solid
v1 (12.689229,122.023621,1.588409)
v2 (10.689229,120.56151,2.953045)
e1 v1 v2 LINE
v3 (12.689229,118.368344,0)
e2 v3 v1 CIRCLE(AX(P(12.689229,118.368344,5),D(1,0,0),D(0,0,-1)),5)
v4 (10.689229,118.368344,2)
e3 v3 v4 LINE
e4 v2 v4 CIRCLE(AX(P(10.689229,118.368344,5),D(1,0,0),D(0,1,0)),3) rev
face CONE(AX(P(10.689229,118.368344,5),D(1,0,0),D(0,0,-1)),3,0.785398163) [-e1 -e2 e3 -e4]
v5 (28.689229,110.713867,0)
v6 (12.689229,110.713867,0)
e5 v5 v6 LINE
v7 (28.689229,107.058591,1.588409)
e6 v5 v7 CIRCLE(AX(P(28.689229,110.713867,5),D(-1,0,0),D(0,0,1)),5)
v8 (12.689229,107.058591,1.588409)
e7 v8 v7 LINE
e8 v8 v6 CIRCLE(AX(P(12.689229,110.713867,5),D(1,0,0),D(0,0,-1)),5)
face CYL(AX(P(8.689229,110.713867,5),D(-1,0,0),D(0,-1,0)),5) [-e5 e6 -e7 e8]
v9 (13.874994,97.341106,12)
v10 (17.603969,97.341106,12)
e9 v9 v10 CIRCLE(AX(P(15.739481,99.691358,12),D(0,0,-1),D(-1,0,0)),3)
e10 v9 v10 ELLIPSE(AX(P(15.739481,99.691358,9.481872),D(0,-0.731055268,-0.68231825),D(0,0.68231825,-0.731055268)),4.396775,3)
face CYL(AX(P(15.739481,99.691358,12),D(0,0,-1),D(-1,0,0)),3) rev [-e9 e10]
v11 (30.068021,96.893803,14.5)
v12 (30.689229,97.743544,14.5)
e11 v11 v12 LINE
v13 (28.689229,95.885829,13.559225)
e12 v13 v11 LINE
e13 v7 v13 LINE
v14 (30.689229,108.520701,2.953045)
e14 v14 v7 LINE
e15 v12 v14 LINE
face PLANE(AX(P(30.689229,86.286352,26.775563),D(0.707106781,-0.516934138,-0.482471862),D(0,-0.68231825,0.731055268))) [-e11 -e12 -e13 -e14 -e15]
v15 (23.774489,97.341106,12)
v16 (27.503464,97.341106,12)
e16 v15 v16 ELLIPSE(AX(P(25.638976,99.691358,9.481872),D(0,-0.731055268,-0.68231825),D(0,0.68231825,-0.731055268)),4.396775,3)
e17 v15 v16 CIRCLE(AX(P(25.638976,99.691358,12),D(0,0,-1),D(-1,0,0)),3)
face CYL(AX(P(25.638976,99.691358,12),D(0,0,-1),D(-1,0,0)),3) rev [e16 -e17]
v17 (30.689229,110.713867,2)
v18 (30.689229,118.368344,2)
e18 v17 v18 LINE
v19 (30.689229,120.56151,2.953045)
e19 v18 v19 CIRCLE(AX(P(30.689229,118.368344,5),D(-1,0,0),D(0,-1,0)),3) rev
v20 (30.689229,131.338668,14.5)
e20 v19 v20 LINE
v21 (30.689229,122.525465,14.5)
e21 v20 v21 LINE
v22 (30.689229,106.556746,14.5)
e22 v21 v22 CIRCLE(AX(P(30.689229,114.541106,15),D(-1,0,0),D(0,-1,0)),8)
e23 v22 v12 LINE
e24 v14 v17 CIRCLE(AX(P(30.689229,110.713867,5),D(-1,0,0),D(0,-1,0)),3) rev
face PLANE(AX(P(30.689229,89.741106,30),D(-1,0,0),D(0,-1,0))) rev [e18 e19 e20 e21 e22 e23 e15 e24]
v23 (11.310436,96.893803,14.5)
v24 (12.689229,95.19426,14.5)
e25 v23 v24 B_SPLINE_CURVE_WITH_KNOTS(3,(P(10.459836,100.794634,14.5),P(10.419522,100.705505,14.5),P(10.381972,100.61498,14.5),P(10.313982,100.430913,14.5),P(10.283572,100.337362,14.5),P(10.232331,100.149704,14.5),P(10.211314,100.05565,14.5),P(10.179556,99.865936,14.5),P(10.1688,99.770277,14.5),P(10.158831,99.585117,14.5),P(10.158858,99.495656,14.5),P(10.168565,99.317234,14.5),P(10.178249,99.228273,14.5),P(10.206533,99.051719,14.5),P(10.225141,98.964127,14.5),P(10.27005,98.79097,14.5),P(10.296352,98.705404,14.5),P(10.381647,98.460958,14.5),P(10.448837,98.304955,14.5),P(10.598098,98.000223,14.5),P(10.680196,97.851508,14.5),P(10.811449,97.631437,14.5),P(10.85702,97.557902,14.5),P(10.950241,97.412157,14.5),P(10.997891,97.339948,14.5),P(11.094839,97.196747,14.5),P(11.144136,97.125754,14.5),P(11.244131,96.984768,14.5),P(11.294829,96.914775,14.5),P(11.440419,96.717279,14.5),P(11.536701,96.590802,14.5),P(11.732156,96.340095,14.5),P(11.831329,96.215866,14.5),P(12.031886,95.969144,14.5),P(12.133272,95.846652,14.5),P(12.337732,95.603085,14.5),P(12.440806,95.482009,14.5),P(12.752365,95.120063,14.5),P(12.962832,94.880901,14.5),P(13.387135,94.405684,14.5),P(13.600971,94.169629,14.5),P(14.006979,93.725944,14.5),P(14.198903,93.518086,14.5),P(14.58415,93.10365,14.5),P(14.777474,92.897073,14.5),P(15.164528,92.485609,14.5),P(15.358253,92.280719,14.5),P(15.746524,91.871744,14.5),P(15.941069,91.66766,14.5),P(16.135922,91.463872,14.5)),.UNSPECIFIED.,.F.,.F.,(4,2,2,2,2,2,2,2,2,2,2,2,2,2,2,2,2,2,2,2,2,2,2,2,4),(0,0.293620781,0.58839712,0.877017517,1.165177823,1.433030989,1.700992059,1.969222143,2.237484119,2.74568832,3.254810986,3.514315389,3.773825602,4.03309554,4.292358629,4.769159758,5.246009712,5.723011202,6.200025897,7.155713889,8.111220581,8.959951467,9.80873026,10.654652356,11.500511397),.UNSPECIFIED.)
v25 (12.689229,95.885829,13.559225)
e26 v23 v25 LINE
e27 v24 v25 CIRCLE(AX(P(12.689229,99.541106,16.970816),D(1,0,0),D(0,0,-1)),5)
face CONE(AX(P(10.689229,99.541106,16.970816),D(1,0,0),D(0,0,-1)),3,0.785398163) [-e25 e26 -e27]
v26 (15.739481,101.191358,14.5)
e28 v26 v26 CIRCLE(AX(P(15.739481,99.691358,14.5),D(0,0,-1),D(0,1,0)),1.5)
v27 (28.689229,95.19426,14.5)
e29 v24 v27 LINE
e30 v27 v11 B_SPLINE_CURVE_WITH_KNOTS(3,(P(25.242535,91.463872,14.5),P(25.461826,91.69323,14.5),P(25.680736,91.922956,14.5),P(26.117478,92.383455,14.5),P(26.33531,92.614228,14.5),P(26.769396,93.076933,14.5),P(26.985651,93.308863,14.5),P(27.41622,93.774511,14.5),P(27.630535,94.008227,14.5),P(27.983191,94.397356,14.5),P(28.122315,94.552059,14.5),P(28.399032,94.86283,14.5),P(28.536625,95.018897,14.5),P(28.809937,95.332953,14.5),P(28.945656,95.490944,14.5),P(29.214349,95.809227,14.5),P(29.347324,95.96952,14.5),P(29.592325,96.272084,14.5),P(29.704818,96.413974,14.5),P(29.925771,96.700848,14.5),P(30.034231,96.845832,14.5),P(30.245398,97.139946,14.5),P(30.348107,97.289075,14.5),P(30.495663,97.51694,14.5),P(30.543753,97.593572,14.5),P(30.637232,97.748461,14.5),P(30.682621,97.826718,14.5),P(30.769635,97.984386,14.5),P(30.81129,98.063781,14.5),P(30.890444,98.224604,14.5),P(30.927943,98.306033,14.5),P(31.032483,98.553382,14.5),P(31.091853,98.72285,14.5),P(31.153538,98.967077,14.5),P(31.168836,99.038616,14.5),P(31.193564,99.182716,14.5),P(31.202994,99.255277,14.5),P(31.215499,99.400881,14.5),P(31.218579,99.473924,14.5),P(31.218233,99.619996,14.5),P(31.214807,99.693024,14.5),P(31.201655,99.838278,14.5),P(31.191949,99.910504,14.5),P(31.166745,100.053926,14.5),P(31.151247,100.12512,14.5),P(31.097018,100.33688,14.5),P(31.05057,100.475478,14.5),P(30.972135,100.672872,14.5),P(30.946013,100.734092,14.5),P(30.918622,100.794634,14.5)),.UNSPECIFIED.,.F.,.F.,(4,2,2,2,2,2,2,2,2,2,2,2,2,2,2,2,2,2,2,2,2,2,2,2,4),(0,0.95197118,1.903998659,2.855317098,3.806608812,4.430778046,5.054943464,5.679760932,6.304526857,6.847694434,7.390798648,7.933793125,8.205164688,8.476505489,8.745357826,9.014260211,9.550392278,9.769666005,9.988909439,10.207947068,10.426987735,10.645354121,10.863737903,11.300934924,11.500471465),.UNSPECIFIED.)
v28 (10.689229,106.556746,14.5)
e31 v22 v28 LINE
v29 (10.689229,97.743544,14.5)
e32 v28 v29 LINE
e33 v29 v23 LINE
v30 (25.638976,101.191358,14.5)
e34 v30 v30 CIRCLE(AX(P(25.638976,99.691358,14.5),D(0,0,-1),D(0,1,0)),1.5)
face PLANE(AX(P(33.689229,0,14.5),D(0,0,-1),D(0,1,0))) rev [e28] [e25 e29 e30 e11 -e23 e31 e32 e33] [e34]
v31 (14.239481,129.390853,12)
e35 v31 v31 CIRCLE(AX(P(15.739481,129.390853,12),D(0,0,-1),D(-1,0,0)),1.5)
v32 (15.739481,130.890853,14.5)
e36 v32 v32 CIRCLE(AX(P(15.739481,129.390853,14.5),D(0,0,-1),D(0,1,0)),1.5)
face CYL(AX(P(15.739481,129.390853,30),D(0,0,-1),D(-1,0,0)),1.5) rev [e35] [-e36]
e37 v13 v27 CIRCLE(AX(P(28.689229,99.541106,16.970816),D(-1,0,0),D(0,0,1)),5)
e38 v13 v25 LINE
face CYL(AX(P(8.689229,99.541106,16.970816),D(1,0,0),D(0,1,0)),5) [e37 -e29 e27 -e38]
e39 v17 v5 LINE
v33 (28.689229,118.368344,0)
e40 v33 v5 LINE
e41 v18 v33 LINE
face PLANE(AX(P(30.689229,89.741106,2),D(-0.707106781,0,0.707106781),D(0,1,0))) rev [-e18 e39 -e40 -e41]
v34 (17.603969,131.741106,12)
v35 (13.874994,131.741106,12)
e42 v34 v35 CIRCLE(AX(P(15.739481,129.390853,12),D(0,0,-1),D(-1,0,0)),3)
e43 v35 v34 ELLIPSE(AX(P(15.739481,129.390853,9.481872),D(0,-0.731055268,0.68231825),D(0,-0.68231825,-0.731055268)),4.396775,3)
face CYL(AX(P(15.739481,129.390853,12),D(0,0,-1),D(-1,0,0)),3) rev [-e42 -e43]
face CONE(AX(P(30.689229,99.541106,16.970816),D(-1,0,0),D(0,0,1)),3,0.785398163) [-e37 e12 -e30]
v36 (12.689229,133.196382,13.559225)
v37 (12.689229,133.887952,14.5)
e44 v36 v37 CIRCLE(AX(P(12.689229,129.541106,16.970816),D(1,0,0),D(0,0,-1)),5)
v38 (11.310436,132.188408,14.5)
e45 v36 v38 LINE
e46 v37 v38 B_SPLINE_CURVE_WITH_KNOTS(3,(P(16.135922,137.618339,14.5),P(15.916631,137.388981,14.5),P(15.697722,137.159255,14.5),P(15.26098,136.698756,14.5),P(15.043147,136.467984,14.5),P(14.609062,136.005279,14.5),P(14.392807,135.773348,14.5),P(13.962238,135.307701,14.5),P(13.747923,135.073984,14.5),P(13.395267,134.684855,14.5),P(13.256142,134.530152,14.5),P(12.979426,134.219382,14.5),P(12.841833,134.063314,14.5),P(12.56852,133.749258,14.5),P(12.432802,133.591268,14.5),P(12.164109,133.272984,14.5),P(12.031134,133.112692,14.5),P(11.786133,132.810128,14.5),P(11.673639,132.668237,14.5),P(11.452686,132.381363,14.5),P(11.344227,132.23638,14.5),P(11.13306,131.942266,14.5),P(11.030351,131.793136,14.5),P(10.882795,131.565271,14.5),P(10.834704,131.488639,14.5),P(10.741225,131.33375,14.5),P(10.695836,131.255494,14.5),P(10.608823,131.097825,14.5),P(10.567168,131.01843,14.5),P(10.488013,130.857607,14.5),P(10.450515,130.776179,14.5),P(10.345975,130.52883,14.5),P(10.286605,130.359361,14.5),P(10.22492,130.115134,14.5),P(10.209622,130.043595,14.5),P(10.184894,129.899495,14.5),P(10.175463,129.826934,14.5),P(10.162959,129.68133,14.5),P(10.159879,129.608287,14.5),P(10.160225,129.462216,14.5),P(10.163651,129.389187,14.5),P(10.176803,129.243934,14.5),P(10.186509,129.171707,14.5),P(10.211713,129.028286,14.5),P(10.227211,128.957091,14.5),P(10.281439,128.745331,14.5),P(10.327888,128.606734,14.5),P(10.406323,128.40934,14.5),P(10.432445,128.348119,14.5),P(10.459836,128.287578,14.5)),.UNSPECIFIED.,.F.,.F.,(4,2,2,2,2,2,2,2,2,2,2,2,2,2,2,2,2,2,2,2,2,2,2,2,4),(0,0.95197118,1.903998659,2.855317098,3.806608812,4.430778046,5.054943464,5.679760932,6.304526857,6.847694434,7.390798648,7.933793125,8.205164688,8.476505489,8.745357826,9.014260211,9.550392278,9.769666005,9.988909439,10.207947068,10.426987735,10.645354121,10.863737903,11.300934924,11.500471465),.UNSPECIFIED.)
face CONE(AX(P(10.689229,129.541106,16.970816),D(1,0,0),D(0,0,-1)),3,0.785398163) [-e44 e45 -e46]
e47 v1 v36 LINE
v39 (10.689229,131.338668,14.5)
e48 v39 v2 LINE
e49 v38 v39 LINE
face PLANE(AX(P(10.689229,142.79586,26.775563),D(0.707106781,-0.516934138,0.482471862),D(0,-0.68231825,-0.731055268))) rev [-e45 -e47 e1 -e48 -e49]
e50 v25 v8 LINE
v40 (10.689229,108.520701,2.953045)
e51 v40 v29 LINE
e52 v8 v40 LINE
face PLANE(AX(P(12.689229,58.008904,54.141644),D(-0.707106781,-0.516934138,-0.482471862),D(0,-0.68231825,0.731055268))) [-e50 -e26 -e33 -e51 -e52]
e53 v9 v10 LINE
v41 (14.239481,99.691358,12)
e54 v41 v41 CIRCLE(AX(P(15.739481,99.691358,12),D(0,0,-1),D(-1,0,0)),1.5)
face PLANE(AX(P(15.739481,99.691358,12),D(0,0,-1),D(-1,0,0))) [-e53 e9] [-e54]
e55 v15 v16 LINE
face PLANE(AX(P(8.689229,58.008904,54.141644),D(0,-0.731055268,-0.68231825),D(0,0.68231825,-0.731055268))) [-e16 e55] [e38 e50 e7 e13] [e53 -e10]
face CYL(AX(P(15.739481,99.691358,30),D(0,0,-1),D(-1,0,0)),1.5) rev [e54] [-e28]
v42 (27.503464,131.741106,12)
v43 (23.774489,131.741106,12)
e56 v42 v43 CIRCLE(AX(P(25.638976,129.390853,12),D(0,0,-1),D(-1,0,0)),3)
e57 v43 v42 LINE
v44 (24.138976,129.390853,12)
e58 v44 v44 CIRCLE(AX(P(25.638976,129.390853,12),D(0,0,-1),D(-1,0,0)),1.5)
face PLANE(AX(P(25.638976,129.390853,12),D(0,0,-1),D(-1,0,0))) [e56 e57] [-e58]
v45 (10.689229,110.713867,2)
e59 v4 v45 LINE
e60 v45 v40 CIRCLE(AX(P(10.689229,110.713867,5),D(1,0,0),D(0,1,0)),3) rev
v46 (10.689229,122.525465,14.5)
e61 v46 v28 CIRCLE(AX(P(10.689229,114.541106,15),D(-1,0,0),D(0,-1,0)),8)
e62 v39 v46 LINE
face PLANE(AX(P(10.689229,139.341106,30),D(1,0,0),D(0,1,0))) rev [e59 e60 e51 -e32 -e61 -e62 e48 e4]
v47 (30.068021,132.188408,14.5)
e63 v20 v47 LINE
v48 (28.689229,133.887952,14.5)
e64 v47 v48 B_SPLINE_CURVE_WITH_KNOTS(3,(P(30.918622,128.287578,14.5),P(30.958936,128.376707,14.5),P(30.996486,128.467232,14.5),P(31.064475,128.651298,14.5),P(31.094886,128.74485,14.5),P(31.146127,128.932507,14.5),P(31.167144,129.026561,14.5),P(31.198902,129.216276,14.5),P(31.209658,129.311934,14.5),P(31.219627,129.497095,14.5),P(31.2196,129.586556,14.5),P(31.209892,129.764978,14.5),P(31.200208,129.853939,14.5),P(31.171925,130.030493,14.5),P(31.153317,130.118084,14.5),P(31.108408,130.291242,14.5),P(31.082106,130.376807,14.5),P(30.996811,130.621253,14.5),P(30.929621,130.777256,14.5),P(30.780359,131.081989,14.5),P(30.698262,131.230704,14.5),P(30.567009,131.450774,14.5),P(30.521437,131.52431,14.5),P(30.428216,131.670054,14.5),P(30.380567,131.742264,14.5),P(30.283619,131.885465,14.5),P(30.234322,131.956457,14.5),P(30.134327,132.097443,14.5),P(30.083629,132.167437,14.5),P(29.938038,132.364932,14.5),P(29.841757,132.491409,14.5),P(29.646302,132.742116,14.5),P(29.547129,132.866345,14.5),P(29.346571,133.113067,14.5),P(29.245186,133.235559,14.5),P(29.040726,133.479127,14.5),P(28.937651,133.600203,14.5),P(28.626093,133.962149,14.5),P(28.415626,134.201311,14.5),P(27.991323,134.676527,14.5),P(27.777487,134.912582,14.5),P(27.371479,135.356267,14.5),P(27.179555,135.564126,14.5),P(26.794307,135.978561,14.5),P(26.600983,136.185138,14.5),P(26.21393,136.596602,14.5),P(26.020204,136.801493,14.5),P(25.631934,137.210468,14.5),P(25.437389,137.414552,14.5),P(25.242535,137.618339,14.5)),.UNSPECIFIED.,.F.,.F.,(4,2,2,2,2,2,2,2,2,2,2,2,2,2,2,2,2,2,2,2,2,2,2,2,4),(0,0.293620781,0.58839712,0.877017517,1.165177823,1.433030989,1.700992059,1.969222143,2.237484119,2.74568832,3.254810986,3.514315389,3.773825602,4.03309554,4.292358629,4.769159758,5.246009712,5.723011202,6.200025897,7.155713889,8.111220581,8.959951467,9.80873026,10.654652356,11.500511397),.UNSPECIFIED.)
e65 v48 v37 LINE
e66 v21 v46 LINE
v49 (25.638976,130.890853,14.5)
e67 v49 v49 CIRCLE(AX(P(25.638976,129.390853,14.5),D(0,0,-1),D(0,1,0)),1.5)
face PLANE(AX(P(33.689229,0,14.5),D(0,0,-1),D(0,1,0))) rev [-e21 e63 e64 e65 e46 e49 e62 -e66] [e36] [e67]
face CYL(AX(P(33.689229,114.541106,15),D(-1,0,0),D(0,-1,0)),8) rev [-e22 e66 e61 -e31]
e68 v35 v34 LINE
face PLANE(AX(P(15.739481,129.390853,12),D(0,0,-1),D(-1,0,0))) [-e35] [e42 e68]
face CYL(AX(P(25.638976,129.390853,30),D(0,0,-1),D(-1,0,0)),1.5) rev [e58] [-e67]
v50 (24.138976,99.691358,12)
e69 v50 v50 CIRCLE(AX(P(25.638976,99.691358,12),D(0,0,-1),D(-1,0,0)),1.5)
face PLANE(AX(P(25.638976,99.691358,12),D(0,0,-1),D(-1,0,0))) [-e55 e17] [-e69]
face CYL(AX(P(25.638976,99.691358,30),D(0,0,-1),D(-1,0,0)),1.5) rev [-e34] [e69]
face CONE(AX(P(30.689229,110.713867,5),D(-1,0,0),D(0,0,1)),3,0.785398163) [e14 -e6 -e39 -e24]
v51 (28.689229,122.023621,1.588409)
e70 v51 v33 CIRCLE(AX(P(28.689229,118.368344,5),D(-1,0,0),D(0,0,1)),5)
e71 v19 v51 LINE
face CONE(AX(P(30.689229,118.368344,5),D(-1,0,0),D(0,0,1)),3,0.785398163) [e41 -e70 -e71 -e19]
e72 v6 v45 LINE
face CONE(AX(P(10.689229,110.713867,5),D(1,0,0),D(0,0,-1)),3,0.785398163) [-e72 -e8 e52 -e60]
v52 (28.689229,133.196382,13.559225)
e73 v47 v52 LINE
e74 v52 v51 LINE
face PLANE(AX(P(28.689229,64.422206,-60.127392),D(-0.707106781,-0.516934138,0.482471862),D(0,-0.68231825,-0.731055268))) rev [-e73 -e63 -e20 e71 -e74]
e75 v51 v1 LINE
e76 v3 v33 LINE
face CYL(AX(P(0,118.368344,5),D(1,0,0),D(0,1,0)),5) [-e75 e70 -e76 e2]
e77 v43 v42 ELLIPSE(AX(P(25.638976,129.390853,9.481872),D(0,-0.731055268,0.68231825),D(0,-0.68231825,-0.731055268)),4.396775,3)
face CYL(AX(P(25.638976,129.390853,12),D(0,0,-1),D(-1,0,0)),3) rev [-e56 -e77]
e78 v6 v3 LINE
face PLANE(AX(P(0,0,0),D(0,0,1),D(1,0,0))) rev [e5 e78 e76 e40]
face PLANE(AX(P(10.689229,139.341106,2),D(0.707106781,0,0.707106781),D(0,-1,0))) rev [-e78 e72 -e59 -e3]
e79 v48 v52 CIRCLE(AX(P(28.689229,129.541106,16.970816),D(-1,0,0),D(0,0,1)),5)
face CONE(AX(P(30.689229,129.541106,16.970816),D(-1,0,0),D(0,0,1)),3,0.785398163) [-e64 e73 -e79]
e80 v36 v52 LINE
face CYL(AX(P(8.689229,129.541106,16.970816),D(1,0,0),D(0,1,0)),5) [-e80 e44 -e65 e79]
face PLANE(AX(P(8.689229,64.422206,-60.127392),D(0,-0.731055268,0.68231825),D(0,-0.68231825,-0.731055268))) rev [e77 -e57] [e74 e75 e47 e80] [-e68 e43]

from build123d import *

# Parameters (mm, degrees)
SKETCH2_W           = 20
SKETCH2_H           = 49.6
SKETCH2_R           = 1.5
BOSS_EXTRUDE1_DEPTH = 30
CUT_EXTRUDE1_DEPTH  = 30
CUT_EXTRUDE2_DEPTH  = 22
FILLET1_R           = 5
FILLET2_R           = 2
CHAMFER1_SIZE       = 2
SKETCH5_R           = 3
SKETCH5_R_2         = 1.5
CUT_EXTRUDE3_DEPTH  = 12
CUT_EXTRUDE4_DEPTH  = 23


with BuildPart() as part:
    # Sketch2 → Boss-Extrude1 (new body)
    with BuildSketch(Plane.XY):
        with Locations((20.689228864, 114.541105708)):
            Rectangle(SKETCH2_W, SKETCH2_H)
        with Locations((15.739481395, 99.69135824)):
            Circle(SKETCH2_R, mode=Mode.SUBTRACT)
        with Locations((25.638976332, 99.69135824)):
            Circle(SKETCH2_R, mode=Mode.SUBTRACT)
        with Locations((25.638976332, 129.390853177)):
            Circle(SKETCH2_R, mode=Mode.SUBTRACT)
        with Locations((15.739481395, 129.390853177)):
            Circle(SKETCH2_R, mode=Mode.SUBTRACT)
    extrude(amount=BOSS_EXTRUDE1_DEPTH)

    # Sketch3 → Cut-Extrude1 (cut)
    with BuildSketch(Plane(origin=(30.689228864, 0, 0), x_dir=(0, 0, -1), z_dir=(1, 0, 0))):
        Polygon((-10, 119.541105708), (-18.024193548, 119.541105708), (-11.975806452, 109.541105708), (-10, 109.541105708), align=None)
        Polygon((-11.975806452, 109.541105708), (-18.024193548, 119.541105708), (-20, 119.541105708), (-20, 109.541105708), align=None)
    extrude(amount=-CUT_EXTRUDE1_DEPTH, mode=Mode.SUBTRACT)

    # Sketch4 → Cut-Extrude2 (cut)
    with BuildSketch(Plane(origin=(30.689228864, 0, 0), x_dir=(0, 0, -1), z_dir=(1, 0, 0))):
        Polygon((-30, 139.341105708), (-27.096774194, 134.541105708), (-15, 134.541105708), (0, 134.541105708), (0, 139.341105708), align=None)
        Polygon((-30, 134.541105708), (-27.096774194, 134.541105708), (-30, 139.341105708), align=None)
        Polygon((-15, 134.541105708), (0, 120.541105708), (0, 134.541105708), align=None)
        Polygon((-7.268041237, 101.757600554), (-2.903225806, 94.541105708), (0, 94.541105708), (0, 108.541105708), align=None)
        Polygon((-15, 94.541105708), (-2.903225806, 94.541105708), (-7.268041237, 101.757600554), align=None)
        Polygon((-30, 89.741105708), (0, 89.741105708), (-2.903225806, 94.541105708), (-15, 94.541105708), (-30, 94.541105708), align=None)
        Polygon((-2.903225806, 94.541105708), (0, 89.741105708), (0, 94.541105708), align=None)
    extrude(amount=-CUT_EXTRUDE2_DEPTH, mode=Mode.SUBTRACT)

    # Fillet1
    fillet1_edges = [part.edges().sort_by_distance(p)[0] for p in [
        (20.689228864, 134.541105708, 15),
        (20.689228864, 120.541105708, 0),
        (20.689228864, 94.541105708, 15),
        (20.689228864, 108.541105708, 0),
    ]]
    fillet(fillet1_edges, radius=FILLET1_R)

    # Fillet2
    fillet2_edges = [part.edges().sort_by_distance(p)[0] for p in [
        (20.689228864, 134.541105708, 30),
        (20.689228864, 94.541105708, 30),
    ]]
    fillet(fillet2_edges, radius=FILLET2_R)

    # Chamfer1
    chamfer1_edges = [part.edges().sort_by_distance(p)[0] for p in [
        (30.689228864, 127.610001295, 7.5738167),
        (10.689228864, 127.610001295, 7.5738167),
        (30.689228864, 114.541105708, 0),
        (30.689228864, 101.472210122, 7.5738167),
        (30.689228864, 108.721124919, 0.414263622),
        (30.689228864, 120.361086498, 0.414263622),
        (30.689228864, 94.889418826, 15.137292206),
        (30.689228864, 134.192792591, 15.137292206),
        (10.689228864, 114.541105708, 0),
        (10.689228864, 101.472210122, 7.5738167),
        (10.689228864, 108.721124919, 0.414263622),
        (10.689228864, 120.361086498, 0.414263622),
        (10.689228864, 94.889418826, 15.137292206),
        (10.689228864, 134.192792591, 15.137292206),
        (10.689228864, 114.541105708, 30),
        (30.689228864, 114.541105708, 30),
        (30.689228864, 134.541105708, 22.485407952),
        (30.689228864, 94.541105708, 22.485407952),
        (30.689228864, 133.955319271, 29.414213562),
        (30.689228864, 95.126892146, 29.414213562),
        (10.689228864, 94.541105708, 22.485407952),
        (10.689228864, 134.541105708, 22.485407952),
        (10.689228864, 133.955319271, 29.414213562),
        (10.689228864, 95.126892146, 29.414213562),
    ]]
    chamfer(chamfer1_edges, length=CHAMFER1_SIZE - 0.0001)  # a hair under: the kernel refuses the full size

    # Sketch5 → Cut-Extrude3 (cut)
    # profile 1 of 4: a face of its own
    with BuildSketch(Plane(origin=(0, 0, 0), x_dir=(-1, 0, 0), z_dir=(0, 0, -1))):
        with Locations((-15.739481395, 99.69135824)):
            Circle(SKETCH5_R)
        with Locations((-15.739481395, 99.69135824)):
            Circle(SKETCH5_R_2, mode=Mode.SUBTRACT)
    # profile 2 of 4: a face of its own
    with BuildSketch(Plane(origin=(0, 0, 0), x_dir=(-1, 0, 0), z_dir=(0, 0, -1))):
        with Locations((-25.638976332, 99.69135824)):
            Circle(SKETCH5_R)
        with Locations((-25.638976332, 99.69135824)):
            Circle(SKETCH5_R_2, mode=Mode.SUBTRACT)
    # profile 3 of 4: a face of its own
    with BuildSketch(Plane(origin=(0, 0, 0), x_dir=(-1, 0, 0), z_dir=(0, 0, -1))):
        with Locations((-15.739481395, 129.390853177)):
            Circle(SKETCH5_R)
        with Locations((-15.739481395, 129.390853177)):
            Circle(SKETCH5_R_2, mode=Mode.SUBTRACT)
    # profile 4 of 4: a face of its own
    with BuildSketch(Plane(origin=(0, 0, 0), x_dir=(-1, 0, 0), z_dir=(0, 0, -1))):
        with Locations((-25.638976332, 129.390853177)):
            Circle(SKETCH5_R)
        with Locations((-25.638976332, 129.390853177)):
            Circle(SKETCH5_R_2, mode=Mode.SUBTRACT)
    extrude(amount=-CUT_EXTRUDE3_DEPTH, mode=Mode.SUBTRACT)

    # Sketch6 → Cut-Extrude4 (cut)
    with BuildSketch(Plane.ZY.offset(-10.689228864)):
        with BuildLine():
            ThreePointArc((16.970815903, 96.541105708), (16.478743483, 96.581736733), (16, 96.70252922))
            Line((16, 96.70252922), (16, 91.202832585))
            Line((16, 91.202832585), (39.910531439, 91.202832585))
            Line((39.910531439, 91.202832585), (39.910531439, 137.879378832))
            Line((39.910531439, 137.879378832), (16, 137.879378832))
            Line((16, 137.879378832), (16, 132.379682197))
            ThreePointArc((16, 132.379682197), (16.478743483, 132.500474684), (16.970815903, 132.541105708))
            Line((16.970815903, 132.541105708), (28, 132.541105708))
            Line((28, 132.541105708), (28, 96.541105708))
            Line((28, 96.541105708), (16.970815903, 96.541105708))
        make_face()
        with BuildLine():
            ThreePointArc((23, 114.541105708), (21, 109.249603086), (16, 106.603851775))
            Line((16, 106.603851775), (16, 96.70252922))
            ThreePointArc((16, 96.70252922), (16.478743483, 96.581736733), (16.970815903, 96.541105708))
            Line((16.970815903, 96.541105708), (28, 96.541105708))
            Line((28, 96.541105708), (28, 132.541105708))
            Line((28, 132.541105708), (16.970815903, 132.541105708))
            ThreePointArc((16.970815903, 132.541105708), (16.478743483, 132.500474684), (16, 132.379682197))
            Line((16, 132.379682197), (16, 122.478359641))
            ThreePointArc((16, 122.478359641), (21, 119.83260833), (23, 114.541105708))
        make_face()
        Polygon((20, 119.541105708), (16, 115.541105708), (16, 109.541105708), (20, 109.541105708), align=None)
        Polygon((16, 119.541105708), (16, 115.541105708), (20, 119.541105708), align=None)
        with BuildLine():
            Line((14.5, 109.541105708), (10, 109.541105708))
            Line((10, 109.541105708), (10, 119.541105708))
            Line((10, 119.541105708), (14.5, 119.541105708))
            Line((14.5, 119.541105708), (14.5, 122.52546542))
            ThreePointArc((14.5, 122.52546542), (7, 114.541105708), (14.5, 106.556745997))
            Line((14.5, 106.556745997), (14.5, 109.541105708))
        make_face()
        with BuildLine():
            Line((20, 109.541105708), (16, 109.541105708))
            Line((16, 109.541105708), (16, 106.603851775))
            ThreePointArc((16, 106.603851775), (21, 109.249603086), (23, 114.541105708))
            ThreePointArc((23, 114.541105708), (21, 119.83260833), (16, 122.478359641))
            Line((16, 122.478359641), (16, 119.541105708))
            Line((16, 119.541105708), (20, 119.541105708))
            Line((20, 119.541105708), (20, 109.541105708))
        make_face()
        Polygon((10, 119.541105708), (10, 109.541105708), (14.5, 114.041105708), (14.5, 119.541105708), align=None)
        with BuildLine():
            Line((14.5, 122.52546542), (14.5, 119.541105708))
            Line((14.5, 119.541105708), (15, 119.541105708))
            Line((15, 119.541105708), (15, 122.541105708))
            ThreePointArc((15, 122.541105708), (14.749877721, 122.53719468), (14.5, 122.52546542))
        make_face()
        with BuildLine():
            Line((15, 122.541105708), (15, 119.541105708))
            Line((15, 119.541105708), (16, 119.541105708))
            Line((16, 119.541105708), (16, 122.478359641))
            ThreePointArc((16, 122.478359641), (15.5009833, 122.525403782), (15, 122.541105708))
        make_face()
        Polygon((14.5, 119.541105708), (14.5, 114.041105708), (15, 114.541105708), (15, 119.541105708), align=None)
        Polygon((15, 119.541105708), (15, 114.541105708), (16, 115.541105708), (16, 119.541105708), align=None)
        Polygon((14.5, 114.041105708), (10, 109.541105708), (14.5, 109.541105708), align=None)
        Polygon((15, 114.541105708), (14.5, 114.041105708), (14.5, 109.541105708), (15, 109.541105708), align=None)
        Polygon((16, 115.541105708), (15, 114.541105708), (15, 109.541105708), (16, 109.541105708), align=None)
        with BuildLine():
            Line((15, 109.541105708), (14.5, 109.541105708))
            Line((14.5, 109.541105708), (14.5, 106.556745997))
            ThreePointArc((14.5, 106.556745997), (14.749877721, 106.545016736), (15, 106.541105708))
            Line((15, 106.541105708), (15, 109.541105708))
        make_face()
        with BuildLine():
            Line((16, 109.541105708), (15, 109.541105708))
            Line((15, 109.541105708), (15, 106.541105708))
            ThreePointArc((15, 106.541105708), (15.5009833, 106.556807634), (16, 106.603851775))
            Line((16, 106.603851775), (16, 109.541105708))
        make_face()
        with BuildLine():
            ThreePointArc((15, 106.541105708), (14.749877721, 106.545016736), (14.5, 106.556745997))
            Line((14.5, 106.556745997), (14.5, 97.743543645))
            Line((14.5, 97.743543645), (14.923861152, 97.347939904))
            ThreePointArc((14.923861152, 97.347939904), (14.961637209, 97.313281439), (15, 97.279273558))
            Line((15, 97.279273558), (15, 106.541105708))
        make_face()
        with BuildLine():
            ThreePointArc((16, 106.603851775), (15.5009833, 106.556807634), (15, 106.541105708))
            Line((15, 106.541105708), (15, 97.279273558))
            ThreePointArc((15, 97.279273558), (15.471997059, 96.942347914), (16, 96.70252922))
            Line((16, 96.70252922), (16, 106.603851775))
        make_face()
        with BuildLine():
            Line((14.923861152, 97.347939904), (14.5, 97.743543645))
            Line((14.5, 97.743543645), (14.5, 91.202832585))
            Line((14.5, 91.202832585), (15, 91.202832585))
            Line((15, 91.202832585), (15, 97.279273558))
            ThreePointArc((15, 97.279273558), (14.961637209, 97.313281439), (14.923861152, 97.347939904))
        make_face()
        with BuildLine():
            ThreePointArc((16, 96.70252922), (15.471997059, 96.942347914), (15, 97.279273558))
            Line((15, 97.279273558), (15, 91.202832585))
            Line((15, 91.202832585), (16, 91.202832585))
            Line((16, 91.202832585), (16, 96.70252922))
        make_face()
        with BuildLine():
            Line((14.5, 131.338667771), (14.5, 122.52546542))
            ThreePointArc((14.5, 122.52546542), (14.749877721, 122.53719468), (15, 122.541105708))
            Line((15, 122.541105708), (15, 131.802937859))
            ThreePointArc((15, 131.802937859), (14.961637209, 131.768929978), (14.923861152, 131.734271513))
            Line((14.923861152, 131.734271513), (14.5, 131.338667771))
        make_face()
        with BuildLine():
            Line((15, 131.802937859), (15, 122.541105708))
            ThreePointArc((15, 122.541105708), (15.5009833, 122.525403782), (16, 122.478359641))
            Line((16, 122.478359641), (16, 132.379682197))
            ThreePointArc((16, 132.379682197), (15.471997059, 132.139863502), (15, 131.802937859))
        make_face()
        with BuildLine():
            Line((14.5, 137.879378832), (14.5, 131.338667771))
            Line((14.5, 131.338667771), (14.923861152, 131.734271513))
            ThreePointArc((14.923861152, 131.734271513), (14.961637209, 131.768929978), (15, 131.802937859))
            Line((15, 131.802937859), (15, 137.879378832))
            Line((15, 137.879378832), (14.5, 137.879378832))
        make_face()
        with BuildLine():
            Line((15, 137.879378832), (15, 131.802937859))
            ThreePointArc((15, 131.802937859), (15.471997059, 132.139863502), (16, 132.379682197))
            Line((16, 132.379682197), (16, 137.879378832))
            Line((16, 137.879378832), (15, 137.879378832))
        make_face()
    extrude(amount=-CUT_EXTRUDE4_DEPTH, mode=Mode.SUBTRACT)


solid = part.part
